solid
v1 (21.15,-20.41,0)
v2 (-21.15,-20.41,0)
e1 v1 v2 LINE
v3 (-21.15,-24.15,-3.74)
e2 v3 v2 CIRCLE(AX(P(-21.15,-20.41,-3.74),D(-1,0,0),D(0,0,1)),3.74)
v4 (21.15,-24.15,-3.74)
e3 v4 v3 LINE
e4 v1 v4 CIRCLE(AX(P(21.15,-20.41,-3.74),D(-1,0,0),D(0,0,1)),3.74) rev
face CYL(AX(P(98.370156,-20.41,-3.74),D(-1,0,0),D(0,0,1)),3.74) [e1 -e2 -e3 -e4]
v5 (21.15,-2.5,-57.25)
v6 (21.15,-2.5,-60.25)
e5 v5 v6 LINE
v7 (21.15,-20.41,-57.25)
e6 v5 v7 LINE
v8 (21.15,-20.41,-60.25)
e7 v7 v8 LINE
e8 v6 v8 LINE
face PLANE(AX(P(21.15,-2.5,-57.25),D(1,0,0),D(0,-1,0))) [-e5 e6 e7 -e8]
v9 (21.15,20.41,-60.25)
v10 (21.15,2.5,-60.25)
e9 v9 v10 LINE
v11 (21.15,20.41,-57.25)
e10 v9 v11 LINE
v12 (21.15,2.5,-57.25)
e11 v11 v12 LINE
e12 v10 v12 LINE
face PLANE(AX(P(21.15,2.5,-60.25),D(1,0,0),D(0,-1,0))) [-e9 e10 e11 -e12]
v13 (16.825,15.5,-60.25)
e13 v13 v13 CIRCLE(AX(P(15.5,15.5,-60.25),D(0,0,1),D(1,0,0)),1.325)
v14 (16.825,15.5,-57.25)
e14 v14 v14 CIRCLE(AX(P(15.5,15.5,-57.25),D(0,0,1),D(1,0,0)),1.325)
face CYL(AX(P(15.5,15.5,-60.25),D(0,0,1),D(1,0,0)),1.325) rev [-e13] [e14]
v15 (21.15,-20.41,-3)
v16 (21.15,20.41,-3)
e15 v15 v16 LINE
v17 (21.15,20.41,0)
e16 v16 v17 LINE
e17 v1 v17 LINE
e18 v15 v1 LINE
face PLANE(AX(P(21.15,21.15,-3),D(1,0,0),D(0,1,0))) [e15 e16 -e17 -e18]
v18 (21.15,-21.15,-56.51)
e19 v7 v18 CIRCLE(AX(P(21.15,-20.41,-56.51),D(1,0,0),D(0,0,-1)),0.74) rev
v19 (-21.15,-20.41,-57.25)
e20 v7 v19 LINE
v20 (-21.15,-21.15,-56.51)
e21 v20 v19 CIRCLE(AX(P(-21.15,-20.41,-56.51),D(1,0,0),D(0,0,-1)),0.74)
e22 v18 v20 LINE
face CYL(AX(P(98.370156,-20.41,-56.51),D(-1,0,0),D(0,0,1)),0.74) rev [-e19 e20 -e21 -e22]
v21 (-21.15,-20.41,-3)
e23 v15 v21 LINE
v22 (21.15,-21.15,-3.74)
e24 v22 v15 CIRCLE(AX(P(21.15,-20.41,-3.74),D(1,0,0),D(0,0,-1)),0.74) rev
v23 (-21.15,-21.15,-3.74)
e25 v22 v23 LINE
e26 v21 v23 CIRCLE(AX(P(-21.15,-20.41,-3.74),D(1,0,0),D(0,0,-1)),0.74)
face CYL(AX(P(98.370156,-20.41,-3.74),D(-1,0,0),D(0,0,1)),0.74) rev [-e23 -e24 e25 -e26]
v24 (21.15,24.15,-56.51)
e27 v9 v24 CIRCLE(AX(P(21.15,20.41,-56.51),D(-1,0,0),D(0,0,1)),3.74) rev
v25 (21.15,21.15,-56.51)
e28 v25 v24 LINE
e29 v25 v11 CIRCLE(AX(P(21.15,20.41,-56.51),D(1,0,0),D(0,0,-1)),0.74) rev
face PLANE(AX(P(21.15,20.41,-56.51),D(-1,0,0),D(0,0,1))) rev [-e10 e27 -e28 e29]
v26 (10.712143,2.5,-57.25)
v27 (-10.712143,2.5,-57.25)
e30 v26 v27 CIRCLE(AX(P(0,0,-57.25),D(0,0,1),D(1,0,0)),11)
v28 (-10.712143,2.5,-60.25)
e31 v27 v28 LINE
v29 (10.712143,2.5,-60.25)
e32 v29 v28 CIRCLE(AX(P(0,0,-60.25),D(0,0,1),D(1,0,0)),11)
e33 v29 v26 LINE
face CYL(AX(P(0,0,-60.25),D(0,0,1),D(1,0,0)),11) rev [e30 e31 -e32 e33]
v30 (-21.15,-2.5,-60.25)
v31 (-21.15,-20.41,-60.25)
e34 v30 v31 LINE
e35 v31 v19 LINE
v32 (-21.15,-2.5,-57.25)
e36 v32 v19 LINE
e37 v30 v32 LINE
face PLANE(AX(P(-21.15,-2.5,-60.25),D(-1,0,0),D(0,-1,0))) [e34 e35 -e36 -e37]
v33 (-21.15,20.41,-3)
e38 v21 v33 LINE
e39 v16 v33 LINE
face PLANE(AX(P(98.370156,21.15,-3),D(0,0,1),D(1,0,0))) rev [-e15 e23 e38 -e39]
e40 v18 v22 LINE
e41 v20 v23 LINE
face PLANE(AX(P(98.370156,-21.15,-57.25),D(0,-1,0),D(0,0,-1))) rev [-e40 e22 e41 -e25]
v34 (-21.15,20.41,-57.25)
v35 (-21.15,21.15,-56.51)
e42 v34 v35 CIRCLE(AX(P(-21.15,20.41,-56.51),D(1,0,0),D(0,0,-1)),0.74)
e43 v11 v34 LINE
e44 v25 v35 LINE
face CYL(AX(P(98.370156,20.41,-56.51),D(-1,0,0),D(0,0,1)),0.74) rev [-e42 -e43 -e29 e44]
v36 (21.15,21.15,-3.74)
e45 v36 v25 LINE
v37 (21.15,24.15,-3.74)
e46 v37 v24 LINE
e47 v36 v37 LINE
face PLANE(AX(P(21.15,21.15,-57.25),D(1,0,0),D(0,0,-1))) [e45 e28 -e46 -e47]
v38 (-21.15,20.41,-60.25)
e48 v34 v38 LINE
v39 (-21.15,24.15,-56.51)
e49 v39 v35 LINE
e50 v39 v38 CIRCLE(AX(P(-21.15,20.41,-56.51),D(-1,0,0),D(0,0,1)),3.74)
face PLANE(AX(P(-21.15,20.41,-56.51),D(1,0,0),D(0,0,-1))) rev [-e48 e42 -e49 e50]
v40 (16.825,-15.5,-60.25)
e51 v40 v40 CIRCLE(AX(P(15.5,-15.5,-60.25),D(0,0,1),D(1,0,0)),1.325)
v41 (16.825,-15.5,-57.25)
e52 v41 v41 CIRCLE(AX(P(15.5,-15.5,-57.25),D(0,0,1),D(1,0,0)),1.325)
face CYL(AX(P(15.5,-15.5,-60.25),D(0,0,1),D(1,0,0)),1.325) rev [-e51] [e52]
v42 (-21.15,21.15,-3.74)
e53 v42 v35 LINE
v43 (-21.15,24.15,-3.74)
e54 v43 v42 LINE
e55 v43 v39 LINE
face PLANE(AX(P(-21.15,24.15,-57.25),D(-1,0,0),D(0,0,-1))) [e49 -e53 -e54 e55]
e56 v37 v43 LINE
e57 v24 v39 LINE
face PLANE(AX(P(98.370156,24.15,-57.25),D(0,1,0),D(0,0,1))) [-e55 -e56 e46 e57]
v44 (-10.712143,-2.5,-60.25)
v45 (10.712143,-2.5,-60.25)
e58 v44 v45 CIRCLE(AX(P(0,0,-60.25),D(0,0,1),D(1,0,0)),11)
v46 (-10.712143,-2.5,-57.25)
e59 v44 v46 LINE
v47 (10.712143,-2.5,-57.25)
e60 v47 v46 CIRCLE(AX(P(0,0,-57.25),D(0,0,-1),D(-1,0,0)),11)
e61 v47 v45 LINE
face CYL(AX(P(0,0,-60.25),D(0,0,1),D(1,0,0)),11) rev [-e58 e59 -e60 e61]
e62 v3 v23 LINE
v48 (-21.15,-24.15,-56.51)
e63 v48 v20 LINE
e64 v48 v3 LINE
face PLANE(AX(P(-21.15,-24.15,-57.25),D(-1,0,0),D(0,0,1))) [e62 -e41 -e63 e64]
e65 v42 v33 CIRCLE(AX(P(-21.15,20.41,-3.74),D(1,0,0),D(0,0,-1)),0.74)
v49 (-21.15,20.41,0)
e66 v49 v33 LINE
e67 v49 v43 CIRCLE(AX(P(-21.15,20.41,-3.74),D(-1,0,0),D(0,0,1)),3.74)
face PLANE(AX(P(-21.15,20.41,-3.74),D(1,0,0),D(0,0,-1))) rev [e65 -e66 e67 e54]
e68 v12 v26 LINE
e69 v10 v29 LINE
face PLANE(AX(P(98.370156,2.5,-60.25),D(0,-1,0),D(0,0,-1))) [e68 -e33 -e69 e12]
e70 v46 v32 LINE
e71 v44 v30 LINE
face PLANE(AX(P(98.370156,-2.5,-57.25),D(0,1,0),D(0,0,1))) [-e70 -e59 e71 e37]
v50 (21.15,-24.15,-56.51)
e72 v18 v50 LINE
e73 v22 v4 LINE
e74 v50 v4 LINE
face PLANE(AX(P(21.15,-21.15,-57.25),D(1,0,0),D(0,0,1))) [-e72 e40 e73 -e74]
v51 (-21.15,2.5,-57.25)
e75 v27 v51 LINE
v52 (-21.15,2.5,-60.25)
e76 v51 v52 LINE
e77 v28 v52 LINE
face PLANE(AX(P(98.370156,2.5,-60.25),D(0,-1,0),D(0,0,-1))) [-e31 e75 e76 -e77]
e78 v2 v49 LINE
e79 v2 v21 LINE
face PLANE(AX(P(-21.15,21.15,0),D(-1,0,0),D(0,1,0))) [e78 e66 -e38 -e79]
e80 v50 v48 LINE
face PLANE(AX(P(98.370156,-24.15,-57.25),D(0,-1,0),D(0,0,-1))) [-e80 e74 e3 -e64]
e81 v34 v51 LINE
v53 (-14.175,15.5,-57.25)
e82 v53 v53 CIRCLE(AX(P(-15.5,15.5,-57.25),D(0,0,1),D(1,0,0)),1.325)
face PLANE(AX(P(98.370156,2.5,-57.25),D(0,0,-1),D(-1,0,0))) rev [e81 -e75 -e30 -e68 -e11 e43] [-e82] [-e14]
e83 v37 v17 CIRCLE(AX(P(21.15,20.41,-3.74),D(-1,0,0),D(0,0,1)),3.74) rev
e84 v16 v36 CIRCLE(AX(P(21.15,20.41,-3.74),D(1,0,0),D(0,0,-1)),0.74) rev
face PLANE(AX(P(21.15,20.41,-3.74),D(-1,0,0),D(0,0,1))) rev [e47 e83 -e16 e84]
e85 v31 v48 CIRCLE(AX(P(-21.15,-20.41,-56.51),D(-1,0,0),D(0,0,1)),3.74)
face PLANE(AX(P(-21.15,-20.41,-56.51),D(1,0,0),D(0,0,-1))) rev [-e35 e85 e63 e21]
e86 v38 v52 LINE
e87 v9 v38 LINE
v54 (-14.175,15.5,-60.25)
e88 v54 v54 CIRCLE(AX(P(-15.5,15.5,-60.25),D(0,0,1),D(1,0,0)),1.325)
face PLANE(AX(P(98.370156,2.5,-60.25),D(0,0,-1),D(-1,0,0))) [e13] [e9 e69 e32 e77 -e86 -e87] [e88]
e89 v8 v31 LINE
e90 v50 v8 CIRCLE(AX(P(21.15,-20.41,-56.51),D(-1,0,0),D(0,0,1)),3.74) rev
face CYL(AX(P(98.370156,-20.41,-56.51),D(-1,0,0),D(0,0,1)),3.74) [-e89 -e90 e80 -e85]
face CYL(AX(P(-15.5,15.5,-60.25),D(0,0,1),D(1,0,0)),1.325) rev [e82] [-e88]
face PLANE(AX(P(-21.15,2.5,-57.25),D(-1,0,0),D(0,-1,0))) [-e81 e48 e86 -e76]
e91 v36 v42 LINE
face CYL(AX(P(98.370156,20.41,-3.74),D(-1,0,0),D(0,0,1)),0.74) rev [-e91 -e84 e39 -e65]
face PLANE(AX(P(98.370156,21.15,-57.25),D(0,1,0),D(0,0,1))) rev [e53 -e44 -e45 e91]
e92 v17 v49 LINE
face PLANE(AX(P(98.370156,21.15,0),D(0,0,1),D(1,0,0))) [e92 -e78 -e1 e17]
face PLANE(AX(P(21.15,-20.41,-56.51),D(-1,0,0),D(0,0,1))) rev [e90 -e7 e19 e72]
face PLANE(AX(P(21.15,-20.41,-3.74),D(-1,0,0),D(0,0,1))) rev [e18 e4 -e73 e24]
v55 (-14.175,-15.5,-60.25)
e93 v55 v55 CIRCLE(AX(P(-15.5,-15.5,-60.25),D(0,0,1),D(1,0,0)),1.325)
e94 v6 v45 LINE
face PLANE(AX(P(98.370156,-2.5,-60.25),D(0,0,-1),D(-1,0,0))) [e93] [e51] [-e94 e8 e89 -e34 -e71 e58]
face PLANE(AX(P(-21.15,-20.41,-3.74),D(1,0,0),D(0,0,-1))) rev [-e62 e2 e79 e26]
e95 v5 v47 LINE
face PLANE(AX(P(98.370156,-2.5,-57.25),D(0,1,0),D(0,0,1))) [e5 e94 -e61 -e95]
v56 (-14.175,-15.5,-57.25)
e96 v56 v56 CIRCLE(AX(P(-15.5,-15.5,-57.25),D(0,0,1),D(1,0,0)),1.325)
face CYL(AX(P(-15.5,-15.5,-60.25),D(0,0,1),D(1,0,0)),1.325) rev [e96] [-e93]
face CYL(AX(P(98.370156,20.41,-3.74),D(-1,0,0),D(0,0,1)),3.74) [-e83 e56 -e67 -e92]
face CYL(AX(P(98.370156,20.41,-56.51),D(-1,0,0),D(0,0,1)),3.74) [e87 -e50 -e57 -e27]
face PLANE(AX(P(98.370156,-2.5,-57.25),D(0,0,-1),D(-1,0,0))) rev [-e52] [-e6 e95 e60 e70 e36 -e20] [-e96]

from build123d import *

# Parameters (mm, degrees)
SM_START               = -21.15
SM_BASE_FLANGE_2_DEPTH = 42.3
SKETCH_11_R            = 1.325
SKETCH_11_R_2          = 11
CUT_EXTRUDE_1_DEPTH    = 66.636175239


# Sheet-metal steps are written as plain solids
with BuildPart() as part:
    # Эскиз6 → Базовая кромка2 (new body)
    with BuildSketch(Plane(origin=(0, 0, 0), x_dir=(0, 0, -1), z_dir=(1, 0, 0)).offset(SM_START)):
        with BuildLine():
            Line((57.25, 2.5), (57.25, 20.41))
            ThreePointArc((57.25, 20.41), (57.033259018, 20.933259018), (56.51, 21.15))
            Line((56.51, 21.15), (3.74, 21.15))
            ThreePointArc((3.74, 21.15), (3.216740982, 20.933259018), (3, 20.41))
            Line((3, 20.41), (3, -20.41))
            ThreePointArc((3, -20.41), (3.216740982, -20.933259018), (3.74, -21.15))
            Line((3.74, -21.15), (56.51, -21.15))
            ThreePointArc((56.51, -21.15), (57.033259018, -20.933259018), (57.25, -20.41))
            Line((57.25, -20.41), (57.25, -2.5))
            Line((57.25, -2.5), (60.25, -2.5))
            Line((60.25, -2.5), (60.25, -20.41))
            ThreePointArc((60.25, -20.41), (59.154579362, -23.054579362), (56.51, -24.15))
            Line((56.51, -24.15), (3.74, -24.15))
            ThreePointArc((3.74, -24.15), (1.095420638, -23.054579362), (0, -20.41))
            Line((0, -20.41), (0, 20.41))
            ThreePointArc((0, 20.41), (1.095420638, 23.054579362), (3.74, 24.15))
            Line((3.74, 24.15), (56.51, 24.15))
            ThreePointArc((56.51, 24.15), (59.154579362, 23.054579362), (60.25, 20.41))
            Line((60.25, 20.41), (60.25, 2.5))
            Line((60.25, 2.5), (57.25, 2.5))
        make_face()
    extrude(amount=SM_BASE_FLANGE_2_DEPTH)

    # Эскиз11 → Вырез-Вытянуть1 (cut, through all)
    with BuildSketch(Plane.XY.offset(-57.25)):
        with Locations((-15.5, 15.5)):
            Circle(SKETCH_11_R)
        with Locations((15.5, 15.5)):
            Circle(SKETCH_11_R)
        with Locations((15.5, -15.5)):
            Circle(SKETCH_11_R)
        Circle(SKETCH_11_R_2)
        with Locations((-15.5, -15.5)):
            Circle(SKETCH_11_R)
    extrude(amount=-CUT_EXTRUDE_1_DEPTH, mode=Mode.SUBTRACT)


solid = part.part
